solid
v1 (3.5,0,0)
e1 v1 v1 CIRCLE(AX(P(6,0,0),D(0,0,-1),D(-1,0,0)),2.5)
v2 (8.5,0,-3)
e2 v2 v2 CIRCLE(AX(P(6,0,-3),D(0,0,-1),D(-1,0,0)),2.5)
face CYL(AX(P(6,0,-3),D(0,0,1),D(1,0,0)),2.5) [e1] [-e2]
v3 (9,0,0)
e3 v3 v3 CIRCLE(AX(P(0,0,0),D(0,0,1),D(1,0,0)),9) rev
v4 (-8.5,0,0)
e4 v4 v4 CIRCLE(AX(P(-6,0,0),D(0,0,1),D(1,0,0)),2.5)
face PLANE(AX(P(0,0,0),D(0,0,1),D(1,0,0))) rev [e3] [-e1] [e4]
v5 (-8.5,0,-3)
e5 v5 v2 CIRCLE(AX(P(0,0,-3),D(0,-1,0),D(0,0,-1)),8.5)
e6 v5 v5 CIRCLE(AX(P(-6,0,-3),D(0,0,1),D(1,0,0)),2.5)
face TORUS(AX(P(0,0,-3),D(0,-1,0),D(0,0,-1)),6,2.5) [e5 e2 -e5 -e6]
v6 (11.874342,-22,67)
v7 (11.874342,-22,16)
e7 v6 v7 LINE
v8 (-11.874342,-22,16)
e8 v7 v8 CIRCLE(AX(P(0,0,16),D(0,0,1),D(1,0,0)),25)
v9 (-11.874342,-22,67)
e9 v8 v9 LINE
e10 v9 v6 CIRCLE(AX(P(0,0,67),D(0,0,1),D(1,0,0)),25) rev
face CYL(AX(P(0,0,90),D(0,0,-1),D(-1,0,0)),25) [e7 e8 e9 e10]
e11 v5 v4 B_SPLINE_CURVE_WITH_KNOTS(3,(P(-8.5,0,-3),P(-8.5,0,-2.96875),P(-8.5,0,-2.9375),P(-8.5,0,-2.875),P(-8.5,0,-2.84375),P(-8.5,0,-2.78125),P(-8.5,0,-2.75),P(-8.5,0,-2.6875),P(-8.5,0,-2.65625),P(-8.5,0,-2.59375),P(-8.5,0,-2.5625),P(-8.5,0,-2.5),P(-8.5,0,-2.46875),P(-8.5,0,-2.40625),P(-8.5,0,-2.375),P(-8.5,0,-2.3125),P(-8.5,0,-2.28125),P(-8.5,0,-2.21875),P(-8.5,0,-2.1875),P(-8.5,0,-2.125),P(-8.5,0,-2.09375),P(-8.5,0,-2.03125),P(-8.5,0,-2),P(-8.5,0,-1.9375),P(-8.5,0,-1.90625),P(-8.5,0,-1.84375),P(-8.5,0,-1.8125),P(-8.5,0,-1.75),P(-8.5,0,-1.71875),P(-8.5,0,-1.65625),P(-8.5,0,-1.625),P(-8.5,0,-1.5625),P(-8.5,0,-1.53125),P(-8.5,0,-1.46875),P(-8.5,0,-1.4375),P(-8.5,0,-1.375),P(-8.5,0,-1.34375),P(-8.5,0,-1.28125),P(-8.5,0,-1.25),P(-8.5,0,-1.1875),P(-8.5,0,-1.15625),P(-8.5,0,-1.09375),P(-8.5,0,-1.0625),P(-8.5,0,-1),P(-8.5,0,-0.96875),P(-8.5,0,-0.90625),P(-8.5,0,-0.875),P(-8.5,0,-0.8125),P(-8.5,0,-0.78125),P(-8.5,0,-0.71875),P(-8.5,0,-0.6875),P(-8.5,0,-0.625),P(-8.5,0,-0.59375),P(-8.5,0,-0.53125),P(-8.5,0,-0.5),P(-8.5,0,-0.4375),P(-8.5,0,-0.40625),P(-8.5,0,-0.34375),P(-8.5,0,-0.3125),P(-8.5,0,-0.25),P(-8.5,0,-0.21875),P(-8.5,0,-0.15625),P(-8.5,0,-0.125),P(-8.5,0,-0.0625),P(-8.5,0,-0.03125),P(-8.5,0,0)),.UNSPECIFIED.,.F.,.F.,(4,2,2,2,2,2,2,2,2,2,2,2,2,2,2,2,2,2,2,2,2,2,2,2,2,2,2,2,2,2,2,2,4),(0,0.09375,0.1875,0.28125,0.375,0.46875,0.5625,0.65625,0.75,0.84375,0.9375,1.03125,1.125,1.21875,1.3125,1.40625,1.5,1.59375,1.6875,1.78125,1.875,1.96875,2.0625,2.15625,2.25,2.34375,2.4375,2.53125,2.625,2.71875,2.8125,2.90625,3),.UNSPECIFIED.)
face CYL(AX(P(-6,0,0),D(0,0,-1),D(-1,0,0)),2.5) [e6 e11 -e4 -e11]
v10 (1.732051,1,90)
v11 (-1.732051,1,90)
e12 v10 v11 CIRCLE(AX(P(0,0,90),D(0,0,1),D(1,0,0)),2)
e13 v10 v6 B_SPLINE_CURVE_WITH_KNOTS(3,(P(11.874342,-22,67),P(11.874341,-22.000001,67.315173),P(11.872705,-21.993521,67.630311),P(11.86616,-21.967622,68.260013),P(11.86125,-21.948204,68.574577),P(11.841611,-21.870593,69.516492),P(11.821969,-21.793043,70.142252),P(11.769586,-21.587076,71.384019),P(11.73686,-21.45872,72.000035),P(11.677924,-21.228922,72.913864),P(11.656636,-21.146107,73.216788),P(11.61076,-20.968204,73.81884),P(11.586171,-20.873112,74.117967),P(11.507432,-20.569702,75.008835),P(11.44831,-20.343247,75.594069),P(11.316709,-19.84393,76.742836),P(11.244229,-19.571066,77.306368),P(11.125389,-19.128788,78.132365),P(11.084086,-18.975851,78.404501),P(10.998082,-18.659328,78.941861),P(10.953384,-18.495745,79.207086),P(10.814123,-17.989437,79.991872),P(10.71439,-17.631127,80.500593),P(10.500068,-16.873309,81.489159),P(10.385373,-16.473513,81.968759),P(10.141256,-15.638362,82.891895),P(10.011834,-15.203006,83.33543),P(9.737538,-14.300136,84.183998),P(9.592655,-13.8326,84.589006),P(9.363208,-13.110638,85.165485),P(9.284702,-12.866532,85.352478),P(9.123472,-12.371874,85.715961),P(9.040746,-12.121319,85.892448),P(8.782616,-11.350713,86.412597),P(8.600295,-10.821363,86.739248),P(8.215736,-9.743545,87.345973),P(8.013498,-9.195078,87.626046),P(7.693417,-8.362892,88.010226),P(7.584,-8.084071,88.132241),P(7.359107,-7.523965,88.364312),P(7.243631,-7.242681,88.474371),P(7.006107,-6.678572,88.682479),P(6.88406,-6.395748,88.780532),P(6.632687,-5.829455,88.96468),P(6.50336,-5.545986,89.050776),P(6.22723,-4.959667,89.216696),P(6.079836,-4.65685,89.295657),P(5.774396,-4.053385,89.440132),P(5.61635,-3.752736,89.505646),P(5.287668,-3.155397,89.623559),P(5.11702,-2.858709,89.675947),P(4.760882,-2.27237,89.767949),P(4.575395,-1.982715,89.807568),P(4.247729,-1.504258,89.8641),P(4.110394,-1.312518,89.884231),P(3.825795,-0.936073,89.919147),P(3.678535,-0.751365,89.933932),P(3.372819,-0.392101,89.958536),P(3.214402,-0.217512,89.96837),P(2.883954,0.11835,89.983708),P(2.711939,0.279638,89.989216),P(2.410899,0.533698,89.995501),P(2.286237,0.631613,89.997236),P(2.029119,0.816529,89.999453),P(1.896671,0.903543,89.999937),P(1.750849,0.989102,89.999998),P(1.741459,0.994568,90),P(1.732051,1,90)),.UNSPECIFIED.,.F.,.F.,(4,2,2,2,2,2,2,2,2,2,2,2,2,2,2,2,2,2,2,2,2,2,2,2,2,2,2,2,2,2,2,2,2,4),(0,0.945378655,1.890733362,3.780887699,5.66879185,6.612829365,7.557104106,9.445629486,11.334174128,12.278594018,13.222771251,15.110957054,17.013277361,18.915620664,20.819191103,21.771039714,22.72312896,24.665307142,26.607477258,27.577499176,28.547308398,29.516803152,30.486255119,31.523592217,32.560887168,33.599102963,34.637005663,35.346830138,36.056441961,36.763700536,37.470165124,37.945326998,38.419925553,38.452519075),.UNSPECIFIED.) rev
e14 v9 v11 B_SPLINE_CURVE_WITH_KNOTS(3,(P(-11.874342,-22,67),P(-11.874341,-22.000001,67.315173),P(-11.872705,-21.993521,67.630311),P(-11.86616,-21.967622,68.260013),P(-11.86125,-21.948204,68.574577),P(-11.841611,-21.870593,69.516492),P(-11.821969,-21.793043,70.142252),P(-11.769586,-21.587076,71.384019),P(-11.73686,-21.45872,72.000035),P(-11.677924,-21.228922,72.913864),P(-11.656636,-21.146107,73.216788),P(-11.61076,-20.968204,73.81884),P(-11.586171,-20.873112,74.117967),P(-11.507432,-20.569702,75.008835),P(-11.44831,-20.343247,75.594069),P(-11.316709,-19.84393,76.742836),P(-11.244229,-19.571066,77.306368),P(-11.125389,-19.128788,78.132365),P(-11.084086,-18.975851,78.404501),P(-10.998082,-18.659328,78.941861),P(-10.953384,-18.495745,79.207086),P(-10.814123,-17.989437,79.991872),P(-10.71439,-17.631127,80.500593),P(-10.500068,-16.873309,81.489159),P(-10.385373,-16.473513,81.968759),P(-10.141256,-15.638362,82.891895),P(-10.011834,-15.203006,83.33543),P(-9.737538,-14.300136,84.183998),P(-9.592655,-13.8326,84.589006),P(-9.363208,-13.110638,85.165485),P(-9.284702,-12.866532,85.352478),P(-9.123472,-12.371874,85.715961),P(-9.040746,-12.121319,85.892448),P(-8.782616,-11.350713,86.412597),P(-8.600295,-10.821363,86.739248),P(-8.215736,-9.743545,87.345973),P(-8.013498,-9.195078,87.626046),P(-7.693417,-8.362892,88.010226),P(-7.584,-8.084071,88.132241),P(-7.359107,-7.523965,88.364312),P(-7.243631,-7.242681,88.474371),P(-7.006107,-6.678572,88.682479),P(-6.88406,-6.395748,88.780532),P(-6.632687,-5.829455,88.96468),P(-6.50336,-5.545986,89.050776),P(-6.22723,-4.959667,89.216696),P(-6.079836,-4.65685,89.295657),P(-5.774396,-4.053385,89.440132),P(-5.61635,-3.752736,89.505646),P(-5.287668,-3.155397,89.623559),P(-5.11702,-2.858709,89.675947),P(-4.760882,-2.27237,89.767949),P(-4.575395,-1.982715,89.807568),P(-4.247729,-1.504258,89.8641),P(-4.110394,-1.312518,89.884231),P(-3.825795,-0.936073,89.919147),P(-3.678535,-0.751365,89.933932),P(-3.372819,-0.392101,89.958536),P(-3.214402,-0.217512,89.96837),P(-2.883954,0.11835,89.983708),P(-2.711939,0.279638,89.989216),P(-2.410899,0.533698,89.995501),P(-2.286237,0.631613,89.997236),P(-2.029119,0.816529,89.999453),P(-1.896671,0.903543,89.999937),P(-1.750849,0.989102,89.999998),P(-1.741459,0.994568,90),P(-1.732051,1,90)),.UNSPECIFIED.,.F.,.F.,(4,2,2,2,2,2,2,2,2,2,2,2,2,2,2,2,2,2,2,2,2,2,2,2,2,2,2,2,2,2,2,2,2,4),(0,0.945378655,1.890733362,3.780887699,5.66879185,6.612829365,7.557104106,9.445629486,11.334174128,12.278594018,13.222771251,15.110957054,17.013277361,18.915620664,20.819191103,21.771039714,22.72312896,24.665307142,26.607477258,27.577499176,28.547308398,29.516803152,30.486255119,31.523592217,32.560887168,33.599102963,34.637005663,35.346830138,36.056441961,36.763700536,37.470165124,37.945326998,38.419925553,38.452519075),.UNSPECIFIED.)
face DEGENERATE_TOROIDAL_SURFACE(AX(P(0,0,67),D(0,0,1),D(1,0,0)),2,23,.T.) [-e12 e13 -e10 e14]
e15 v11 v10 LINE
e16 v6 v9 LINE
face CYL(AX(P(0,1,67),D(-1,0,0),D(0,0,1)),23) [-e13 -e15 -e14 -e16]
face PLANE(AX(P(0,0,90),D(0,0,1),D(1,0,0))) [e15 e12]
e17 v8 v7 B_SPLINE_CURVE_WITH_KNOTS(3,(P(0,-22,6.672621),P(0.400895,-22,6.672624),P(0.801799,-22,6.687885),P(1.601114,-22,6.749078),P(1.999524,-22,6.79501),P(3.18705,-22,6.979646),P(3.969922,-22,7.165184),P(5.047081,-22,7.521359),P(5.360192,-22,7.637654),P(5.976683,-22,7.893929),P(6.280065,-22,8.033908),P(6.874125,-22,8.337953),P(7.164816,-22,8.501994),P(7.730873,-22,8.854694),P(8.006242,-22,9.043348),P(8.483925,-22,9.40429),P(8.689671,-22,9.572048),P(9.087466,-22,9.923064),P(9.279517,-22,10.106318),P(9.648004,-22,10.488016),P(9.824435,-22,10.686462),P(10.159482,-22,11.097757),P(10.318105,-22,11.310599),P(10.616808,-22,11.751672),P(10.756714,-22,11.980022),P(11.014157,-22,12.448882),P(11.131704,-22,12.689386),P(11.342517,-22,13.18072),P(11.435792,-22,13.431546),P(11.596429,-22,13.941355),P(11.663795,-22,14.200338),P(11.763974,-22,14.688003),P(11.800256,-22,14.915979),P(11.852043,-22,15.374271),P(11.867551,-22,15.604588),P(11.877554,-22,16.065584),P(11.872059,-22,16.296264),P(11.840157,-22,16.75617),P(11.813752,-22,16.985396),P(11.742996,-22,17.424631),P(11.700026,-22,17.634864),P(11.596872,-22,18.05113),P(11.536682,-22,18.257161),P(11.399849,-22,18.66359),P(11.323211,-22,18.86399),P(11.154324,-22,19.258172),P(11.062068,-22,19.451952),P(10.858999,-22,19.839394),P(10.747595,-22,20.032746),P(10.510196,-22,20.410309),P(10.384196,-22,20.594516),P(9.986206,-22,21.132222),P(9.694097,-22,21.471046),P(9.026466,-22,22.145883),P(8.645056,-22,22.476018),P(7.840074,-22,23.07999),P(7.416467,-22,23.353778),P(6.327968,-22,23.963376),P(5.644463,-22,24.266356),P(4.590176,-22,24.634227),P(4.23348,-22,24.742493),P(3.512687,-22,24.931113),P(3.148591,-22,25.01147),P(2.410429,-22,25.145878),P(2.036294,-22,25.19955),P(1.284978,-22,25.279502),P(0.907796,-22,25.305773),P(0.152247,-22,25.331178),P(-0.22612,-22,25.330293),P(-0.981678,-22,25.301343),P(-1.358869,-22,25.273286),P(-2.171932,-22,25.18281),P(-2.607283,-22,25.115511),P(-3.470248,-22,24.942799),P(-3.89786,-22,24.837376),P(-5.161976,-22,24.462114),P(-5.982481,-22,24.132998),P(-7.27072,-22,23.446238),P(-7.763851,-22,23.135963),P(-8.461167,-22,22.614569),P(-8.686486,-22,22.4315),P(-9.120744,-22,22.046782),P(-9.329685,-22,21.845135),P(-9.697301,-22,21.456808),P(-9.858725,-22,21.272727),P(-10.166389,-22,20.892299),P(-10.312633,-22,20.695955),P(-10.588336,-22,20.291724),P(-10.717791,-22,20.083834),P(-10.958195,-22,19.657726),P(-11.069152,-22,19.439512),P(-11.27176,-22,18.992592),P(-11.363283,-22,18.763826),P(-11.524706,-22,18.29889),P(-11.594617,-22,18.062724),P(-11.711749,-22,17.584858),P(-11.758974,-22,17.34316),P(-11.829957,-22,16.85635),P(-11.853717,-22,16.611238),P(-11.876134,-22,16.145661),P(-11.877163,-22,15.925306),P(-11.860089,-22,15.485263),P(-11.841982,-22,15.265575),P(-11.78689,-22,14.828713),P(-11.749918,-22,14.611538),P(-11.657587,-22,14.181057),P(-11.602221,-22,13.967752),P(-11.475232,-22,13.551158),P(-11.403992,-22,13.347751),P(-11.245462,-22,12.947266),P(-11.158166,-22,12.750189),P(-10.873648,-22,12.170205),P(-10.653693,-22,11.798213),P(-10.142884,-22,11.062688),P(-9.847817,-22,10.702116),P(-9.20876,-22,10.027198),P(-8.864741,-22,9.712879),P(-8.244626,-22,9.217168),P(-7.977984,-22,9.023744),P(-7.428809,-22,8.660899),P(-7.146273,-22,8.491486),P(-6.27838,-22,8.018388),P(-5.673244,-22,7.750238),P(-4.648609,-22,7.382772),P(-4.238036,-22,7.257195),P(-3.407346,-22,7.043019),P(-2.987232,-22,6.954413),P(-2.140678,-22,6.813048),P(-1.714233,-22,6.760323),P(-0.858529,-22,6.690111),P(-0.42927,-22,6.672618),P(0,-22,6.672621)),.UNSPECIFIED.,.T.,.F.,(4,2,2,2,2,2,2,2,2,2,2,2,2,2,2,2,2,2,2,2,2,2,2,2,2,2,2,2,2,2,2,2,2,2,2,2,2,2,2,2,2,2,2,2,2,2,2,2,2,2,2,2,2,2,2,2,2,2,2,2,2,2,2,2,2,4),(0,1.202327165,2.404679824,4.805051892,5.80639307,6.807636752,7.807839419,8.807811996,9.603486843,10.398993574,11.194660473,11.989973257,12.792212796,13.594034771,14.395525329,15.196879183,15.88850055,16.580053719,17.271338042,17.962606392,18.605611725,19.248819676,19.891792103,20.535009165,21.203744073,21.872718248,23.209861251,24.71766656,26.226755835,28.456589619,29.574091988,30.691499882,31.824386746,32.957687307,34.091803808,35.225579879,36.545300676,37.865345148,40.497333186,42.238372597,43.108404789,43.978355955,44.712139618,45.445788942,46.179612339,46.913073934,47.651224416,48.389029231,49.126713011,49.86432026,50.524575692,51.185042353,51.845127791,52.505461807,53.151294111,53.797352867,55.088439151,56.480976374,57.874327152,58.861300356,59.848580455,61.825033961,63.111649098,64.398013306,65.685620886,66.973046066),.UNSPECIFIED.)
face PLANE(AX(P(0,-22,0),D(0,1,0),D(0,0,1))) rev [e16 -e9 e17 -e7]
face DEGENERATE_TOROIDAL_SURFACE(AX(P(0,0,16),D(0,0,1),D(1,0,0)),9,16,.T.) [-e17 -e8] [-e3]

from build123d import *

# Parameters (mm, degrees)
CROQUIS1_R              = 25
SALIENTE_EXTRUIR1_DEPTH = 90
CROQUIS4_R              = 2.5
REDONDEO2_R             = 16
CORTAR_EXTRUIR2_START   = -22
CROQUIS12_W             = 90
CROQUIS12_H             = 90
CORTAR_EXTRUIR2_DEPTH   = 30
REDONDEO3_R             = 23


with BuildPart() as part:
    # Croquis1 → Saliente-Extruir1 (new body)
    with BuildSketch(Plane.XY):
        with Locations(Location((0, 0, 0), (0, 0, 180))):
            Circle(CROQUIS1_R)
    extrude(amount=SALIENTE_EXTRUIR1_DEPTH)

    # Barrer3: sweep along a path in Croquis3
    with BuildLine(Plane(origin=(0, 0, 0), x_dir=(1, 0, 0), z_dir=(0, 1, 0))) as barrer3_path:
        Line((-3, 0), (-3, 3))
        ThreePointArc((-3, 3), (0, 6), (3, 3))
        Line((3, 3), (3, 0))
    # Croquis4 → Barrer3 (sweep)
    with BuildSketch(Plane(origin=(0, 0, 0), x_dir=(-1, 0, 0), z_dir=(0, 0, -1))):
        with Locations((-6, 0)):
            Circle(CROQUIS4_R)
    sweep(path=barrer3_path.line)

    # Redondeo2
    redondeo2_edges = [part.edges().sort_by_distance(p)[0] for p in [
        (25, 0, 0),
    ]]
    fillet(redondeo2_edges, radius=REDONDEO2_R)

    # Croquis12 → Cortar-Extruir2 (cut)
    with BuildSketch(Plane(origin=(0, 0, 0), x_dir=(1, 0, 0), z_dir=(0, 1, 0)).offset(CORTAR_EXTRUIR2_START)):
        with Locations((-20, -45)):
            Rectangle(CROQUIS12_W, CROQUIS12_H)
    extrude(amount=-CORTAR_EXTRUIR2_DEPTH, mode=Mode.SUBTRACT)

    # Redondeo3
    # the kernel refuses this fillet: 23 mm, written as the material it takes off along each edge
    with BuildSketch(Plane(origin=(0, 0, 90), x_dir=(-0.003141587485819883, -0.9999950652018583, 0), z_dir=(0.9999950652018583, -0.003141587485819883, 0))) as redondeo3_piece_1:
        with BuildLine():
            CenterArc((25 - REDONDEO3_R, REDONDEO3_R), REDONDEO3_R, 270, 90)
            Line((25 - REDONDEO3_R, 0), (25, 0))
            Line((25, 0), (25, REDONDEO3_R))
        make_face()
    revolve(axis=Axis((0, 0, 90), (0, 0, -1)), revolution_arc=359.64, mode=Mode.SUBTRACT)
    with BuildSketch(Plane(origin=(69.374342087, -22, 90), x_dir=(0, 1, 0), z_dir=(-1, 0, 0))) as redondeo3_piece_2:
        with BuildLine():
            CenterArc((REDONDEO3_R, REDONDEO3_R), REDONDEO3_R, 180, 90)
            Line((0, REDONDEO3_R), (0, 0))
            Line((0, 0), (REDONDEO3_R, 0))
        make_face()
    extrude(amount=138.748684174, mode=Mode.SUBTRACT)


solid = part.part
